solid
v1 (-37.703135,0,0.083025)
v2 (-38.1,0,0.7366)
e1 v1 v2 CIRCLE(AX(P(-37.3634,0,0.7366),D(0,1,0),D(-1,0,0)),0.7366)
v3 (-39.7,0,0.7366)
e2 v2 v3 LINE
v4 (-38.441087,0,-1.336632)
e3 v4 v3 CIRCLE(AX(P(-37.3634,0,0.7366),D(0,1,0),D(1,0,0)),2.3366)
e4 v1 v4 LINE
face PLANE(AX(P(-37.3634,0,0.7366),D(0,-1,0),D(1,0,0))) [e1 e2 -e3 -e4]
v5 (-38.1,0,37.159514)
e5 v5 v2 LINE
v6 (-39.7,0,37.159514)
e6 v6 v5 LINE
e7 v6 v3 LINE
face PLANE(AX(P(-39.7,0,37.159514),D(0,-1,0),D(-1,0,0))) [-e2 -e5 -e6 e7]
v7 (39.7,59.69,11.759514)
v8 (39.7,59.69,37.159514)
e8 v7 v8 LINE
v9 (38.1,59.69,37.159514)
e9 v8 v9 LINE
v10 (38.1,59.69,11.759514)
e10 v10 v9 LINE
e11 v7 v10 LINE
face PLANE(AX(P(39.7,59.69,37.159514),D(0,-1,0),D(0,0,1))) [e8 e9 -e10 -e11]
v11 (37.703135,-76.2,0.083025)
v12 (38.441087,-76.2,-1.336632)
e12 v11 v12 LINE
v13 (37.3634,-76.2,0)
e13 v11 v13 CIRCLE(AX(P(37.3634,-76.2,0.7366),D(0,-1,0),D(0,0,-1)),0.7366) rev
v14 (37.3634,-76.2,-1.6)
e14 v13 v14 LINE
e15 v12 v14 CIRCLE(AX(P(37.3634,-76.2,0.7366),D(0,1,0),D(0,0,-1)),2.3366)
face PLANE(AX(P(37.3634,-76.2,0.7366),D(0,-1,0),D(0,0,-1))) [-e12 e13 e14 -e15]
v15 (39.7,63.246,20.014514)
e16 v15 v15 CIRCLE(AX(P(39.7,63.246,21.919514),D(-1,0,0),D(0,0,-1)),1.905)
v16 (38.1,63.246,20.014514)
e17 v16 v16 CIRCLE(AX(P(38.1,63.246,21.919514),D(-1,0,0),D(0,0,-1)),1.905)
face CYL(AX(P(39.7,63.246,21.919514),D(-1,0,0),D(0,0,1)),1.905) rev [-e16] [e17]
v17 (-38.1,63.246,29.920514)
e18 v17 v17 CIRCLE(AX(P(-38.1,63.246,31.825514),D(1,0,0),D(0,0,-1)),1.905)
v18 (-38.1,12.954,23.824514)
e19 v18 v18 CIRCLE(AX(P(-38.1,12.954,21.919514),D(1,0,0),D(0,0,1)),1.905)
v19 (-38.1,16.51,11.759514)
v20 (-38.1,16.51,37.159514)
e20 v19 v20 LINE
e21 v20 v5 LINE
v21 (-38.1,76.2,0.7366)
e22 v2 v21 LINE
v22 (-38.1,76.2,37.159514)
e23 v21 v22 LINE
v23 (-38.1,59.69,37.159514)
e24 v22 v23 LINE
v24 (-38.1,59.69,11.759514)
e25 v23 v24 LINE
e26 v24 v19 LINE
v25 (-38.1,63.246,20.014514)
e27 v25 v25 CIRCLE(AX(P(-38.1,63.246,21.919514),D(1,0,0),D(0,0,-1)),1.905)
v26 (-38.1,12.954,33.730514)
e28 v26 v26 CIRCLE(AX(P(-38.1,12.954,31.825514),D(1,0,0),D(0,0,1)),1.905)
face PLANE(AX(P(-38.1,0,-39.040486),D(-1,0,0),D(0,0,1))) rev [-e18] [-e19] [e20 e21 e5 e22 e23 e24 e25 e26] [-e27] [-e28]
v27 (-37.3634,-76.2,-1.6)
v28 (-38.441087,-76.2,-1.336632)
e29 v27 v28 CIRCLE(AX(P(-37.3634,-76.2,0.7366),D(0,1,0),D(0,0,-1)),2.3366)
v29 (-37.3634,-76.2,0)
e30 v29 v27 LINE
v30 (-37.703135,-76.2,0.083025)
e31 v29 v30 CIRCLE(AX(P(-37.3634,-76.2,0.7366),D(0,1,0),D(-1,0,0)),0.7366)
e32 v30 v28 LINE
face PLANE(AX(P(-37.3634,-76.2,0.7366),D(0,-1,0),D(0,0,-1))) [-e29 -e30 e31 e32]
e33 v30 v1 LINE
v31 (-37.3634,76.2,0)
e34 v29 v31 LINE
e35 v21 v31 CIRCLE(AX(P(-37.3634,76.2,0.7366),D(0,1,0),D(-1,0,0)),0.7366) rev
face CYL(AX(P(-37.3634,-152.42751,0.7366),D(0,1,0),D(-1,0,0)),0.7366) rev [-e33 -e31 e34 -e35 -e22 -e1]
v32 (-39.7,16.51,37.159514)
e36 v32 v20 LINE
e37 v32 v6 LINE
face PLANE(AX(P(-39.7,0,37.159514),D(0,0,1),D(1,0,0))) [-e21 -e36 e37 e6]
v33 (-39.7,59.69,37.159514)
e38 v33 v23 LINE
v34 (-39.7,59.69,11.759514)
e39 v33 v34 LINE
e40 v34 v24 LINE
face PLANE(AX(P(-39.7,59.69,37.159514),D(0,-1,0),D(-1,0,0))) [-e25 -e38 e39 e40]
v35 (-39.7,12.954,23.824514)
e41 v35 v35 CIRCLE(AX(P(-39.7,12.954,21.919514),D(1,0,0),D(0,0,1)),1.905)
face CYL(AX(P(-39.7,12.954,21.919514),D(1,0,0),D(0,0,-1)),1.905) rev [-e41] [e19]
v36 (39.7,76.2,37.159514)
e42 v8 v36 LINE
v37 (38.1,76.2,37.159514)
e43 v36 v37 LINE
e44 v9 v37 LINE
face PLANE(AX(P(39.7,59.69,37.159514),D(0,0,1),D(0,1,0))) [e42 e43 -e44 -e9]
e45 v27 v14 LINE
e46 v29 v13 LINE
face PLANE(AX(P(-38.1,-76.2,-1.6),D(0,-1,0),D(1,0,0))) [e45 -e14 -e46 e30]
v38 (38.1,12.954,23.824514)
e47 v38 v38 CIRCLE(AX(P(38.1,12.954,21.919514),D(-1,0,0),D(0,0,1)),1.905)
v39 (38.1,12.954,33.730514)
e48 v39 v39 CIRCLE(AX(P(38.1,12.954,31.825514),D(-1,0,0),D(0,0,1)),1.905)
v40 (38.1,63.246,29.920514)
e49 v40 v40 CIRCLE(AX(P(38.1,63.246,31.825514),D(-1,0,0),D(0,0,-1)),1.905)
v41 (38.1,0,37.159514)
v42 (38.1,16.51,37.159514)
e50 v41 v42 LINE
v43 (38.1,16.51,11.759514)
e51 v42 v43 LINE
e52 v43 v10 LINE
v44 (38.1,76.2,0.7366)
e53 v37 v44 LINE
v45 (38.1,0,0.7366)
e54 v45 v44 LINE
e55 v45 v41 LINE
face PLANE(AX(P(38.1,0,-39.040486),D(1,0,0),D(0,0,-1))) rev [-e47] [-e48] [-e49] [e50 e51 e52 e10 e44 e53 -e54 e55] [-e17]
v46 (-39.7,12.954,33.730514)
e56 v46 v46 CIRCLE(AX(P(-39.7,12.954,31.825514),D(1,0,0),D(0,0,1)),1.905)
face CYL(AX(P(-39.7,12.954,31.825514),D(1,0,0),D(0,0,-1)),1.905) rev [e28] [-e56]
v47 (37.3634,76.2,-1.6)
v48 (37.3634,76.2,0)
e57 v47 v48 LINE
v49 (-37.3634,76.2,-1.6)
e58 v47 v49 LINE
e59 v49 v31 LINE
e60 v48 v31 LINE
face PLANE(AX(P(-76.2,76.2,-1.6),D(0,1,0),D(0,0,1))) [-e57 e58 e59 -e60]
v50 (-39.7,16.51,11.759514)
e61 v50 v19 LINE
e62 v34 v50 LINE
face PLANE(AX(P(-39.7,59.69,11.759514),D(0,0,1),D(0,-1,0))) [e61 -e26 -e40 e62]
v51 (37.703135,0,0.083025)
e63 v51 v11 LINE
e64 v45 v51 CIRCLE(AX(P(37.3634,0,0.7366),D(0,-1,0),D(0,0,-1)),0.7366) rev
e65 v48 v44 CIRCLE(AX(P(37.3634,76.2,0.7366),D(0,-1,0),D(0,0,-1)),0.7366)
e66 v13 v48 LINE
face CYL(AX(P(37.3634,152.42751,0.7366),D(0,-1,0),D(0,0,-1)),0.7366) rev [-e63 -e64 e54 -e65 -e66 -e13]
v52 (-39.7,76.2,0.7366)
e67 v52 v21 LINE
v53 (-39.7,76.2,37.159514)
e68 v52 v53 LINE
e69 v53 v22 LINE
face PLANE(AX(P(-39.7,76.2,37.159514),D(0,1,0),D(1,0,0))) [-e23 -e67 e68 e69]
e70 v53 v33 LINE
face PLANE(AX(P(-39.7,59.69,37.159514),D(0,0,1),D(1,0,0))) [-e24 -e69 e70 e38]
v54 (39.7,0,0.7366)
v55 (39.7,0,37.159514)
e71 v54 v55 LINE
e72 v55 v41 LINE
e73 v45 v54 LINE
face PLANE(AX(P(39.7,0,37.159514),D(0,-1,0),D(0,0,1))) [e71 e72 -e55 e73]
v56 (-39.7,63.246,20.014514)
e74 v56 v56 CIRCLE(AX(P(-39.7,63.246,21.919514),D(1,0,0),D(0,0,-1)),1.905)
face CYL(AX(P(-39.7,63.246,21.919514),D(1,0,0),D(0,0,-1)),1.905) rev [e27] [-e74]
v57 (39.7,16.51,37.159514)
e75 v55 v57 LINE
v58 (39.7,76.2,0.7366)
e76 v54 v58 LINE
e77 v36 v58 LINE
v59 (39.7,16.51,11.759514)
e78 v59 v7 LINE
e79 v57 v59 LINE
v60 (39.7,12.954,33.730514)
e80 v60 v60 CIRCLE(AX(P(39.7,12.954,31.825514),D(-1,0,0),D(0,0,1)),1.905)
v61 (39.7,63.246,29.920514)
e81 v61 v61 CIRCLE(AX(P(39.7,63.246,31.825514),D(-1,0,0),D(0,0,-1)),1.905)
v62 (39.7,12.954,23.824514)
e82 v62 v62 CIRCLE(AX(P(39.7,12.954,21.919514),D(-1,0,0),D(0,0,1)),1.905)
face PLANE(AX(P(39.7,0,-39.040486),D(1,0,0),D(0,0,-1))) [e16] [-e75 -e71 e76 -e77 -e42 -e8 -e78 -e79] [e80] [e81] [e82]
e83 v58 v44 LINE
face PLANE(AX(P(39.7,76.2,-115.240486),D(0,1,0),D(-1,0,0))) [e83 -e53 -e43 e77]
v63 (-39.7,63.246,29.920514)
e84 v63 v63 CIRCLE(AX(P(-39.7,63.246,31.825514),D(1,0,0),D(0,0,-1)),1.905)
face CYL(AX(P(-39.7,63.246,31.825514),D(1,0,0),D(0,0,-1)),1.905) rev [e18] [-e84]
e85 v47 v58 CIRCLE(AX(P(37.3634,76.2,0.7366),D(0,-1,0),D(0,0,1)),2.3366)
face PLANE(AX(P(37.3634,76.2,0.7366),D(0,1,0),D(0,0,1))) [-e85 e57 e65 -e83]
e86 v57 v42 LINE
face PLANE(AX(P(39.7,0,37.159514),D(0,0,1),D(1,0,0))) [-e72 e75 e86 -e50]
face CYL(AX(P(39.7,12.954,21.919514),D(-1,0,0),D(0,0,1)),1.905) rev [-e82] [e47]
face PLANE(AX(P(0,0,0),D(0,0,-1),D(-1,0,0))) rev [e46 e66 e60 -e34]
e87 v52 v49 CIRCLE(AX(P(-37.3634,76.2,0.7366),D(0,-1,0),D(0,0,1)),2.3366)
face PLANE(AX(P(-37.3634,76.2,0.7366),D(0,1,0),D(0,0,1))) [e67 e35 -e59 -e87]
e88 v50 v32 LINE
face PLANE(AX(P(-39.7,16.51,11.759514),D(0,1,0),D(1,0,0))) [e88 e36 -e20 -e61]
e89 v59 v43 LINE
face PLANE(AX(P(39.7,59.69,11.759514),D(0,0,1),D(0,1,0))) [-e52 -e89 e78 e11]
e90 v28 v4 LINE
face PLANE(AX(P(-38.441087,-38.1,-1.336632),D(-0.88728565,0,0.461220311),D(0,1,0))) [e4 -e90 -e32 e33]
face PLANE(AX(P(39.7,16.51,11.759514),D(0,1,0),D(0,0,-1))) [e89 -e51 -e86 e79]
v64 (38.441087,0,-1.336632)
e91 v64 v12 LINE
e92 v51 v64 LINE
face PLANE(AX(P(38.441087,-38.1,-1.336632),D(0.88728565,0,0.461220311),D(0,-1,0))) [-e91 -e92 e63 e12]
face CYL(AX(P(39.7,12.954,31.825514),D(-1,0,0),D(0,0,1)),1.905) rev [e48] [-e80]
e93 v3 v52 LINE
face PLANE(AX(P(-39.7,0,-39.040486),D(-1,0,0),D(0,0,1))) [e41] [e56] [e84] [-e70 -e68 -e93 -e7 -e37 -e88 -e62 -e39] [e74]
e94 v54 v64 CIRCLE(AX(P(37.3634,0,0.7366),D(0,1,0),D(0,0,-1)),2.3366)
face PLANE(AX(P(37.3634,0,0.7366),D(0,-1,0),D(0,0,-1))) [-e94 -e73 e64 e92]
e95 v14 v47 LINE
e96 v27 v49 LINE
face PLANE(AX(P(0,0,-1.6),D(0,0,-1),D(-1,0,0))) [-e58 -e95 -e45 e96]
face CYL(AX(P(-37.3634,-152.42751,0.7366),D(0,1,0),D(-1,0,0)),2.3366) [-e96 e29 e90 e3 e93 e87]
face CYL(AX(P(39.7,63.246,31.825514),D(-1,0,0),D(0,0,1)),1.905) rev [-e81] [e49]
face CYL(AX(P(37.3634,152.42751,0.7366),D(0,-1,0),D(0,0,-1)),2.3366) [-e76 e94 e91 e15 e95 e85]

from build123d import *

# Parameters (mm, degrees)
SKETCH1_R                  = 1.905
BASE_FLANGE1_DEPTH         = 1.6
SKETCHED_START             = -76.2
SKETCHED_BEND1_OUTLINE_W   = 76.2
SKETCHED_BEND1_OUTLINE_H   = 1.6
SKETCHED_BEND1_DEPTH       = 36.5
SKETCHED_START_2           = 39.7
SKETCHED_BEND1_2_OUTLINE_W = 76.2
SKETCHED_BEND1_2_OUTLINE_H = 1.6
SKETCHED_BEND1_2_DEPTH     = 36.5
SKETCHED_START_3           = -39.7
SKETCHED_BEND1_3_OUTLINE_R = 1.905
SKETCHED_BEND1_3_DEPTH     = 2.3366
SKETCHED_START_4           = 37.3634
SKETCHED_BEND1_4_OUTLINE_R = 1.905
SKETCHED_BEND1_4_DEPTH     = 2.3366
SKETCHED_START_5           = -38.441087378
SKETCHED_BEND1_5_OUTLINE_W = 76.2
SKETCHED_BEND1_5_OUTLINE_H = 1.6
SKETCHED_BEND1_5_DEPTH     = 0.341087378
SKETCHED_START_6           = 38.1
SKETCHED_BEND1_6_OUTLINE_W = 76.2
SKETCHED_BEND1_6_OUTLINE_H = 1.6
SKETCHED_BEND1_6_DEPTH     = 0.341087378
SKETCHED_START_7           = -77
SKETCHED_BEND1_7_DEPTH     = 154
SKETCHED_BEND1_8_DEPTH     = 77
SKETCHED_BEND1_9_DEPTH     = 76.2


with BuildPart() as part:
    # Base-Flange1: sheet metal written as solids
    # Sketch1 → Base-Flange1 (new body)
    with BuildSketch(Plane.XY):
        Polygon((-76.2, 59.69), (-50.8, 59.69), (-50.8, 16.51), (-76.2, 16.51), (-76.2, 0), (-38.1, 0), (-38.1, -76.2), (38.1, -76.2), (38.1, 0), (76.2, 0), (76.2, 16.51), (50.8, 16.51), (50.8, 59.69), (76.2, 59.69), (76.2, 76.2), (-76.2, 76.2), align=None)
        with Locations((-60.96, 63.246)):
            Circle(SKETCH1_R, mode=Mode.SUBTRACT)
        with Locations((-70.866, 63.246)):
            Circle(SKETCH1_R, mode=Mode.SUBTRACT)
        with Locations(Location((-70.866, 12.954, 0), (0, 0, 180))):
            Circle(SKETCH1_R, mode=Mode.SUBTRACT)
        with Locations(Location((-60.96, 12.954, 0), (0, 0, 180))):
            Circle(SKETCH1_R, mode=Mode.SUBTRACT)
        with Locations((60.96, 12.954)):
            Circle(SKETCH1_R, mode=Mode.SUBTRACT)
        with Locations((70.866, 12.954)):
            Circle(SKETCH1_R, mode=Mode.SUBTRACT)
        with Locations(Location((70.866, 63.246, 0), (0, 0, 180))):
            Circle(SKETCH1_R, mode=Mode.SUBTRACT)
        with Locations(Location((60.96, 63.246, 0), (0, 0, 180))):
            Circle(SKETCH1_R, mode=Mode.SUBTRACT)
    extrude(amount=-BASE_FLANGE1_DEPTH)

    # Sketched Bend1: read off the stored shape, not the designer's step
    # Sketched Bend1 outline → Sketched Bend1 (cut)
    with BuildSketch(Plane.YZ.offset(SKETCHED_START)):
        with Locations((38.1, -0.8)):
            Rectangle(SKETCHED_BEND1_OUTLINE_W, SKETCHED_BEND1_OUTLINE_H)
    extrude(amount=SKETCHED_BEND1_DEPTH, mode=Mode.SUBTRACT)

    # Sketched Bend1 2 outline → Sketched Bend1 2 (cut)
    with BuildSketch(Plane.YZ.offset(SKETCHED_START_2)):
        with Locations((38.1, -0.8)):
            Rectangle(SKETCHED_BEND1_2_OUTLINE_W, SKETCHED_BEND1_2_OUTLINE_H)
    extrude(amount=SKETCHED_BEND1_2_DEPTH, mode=Mode.SUBTRACT)

    # Sketched Bend1 3 outline → Sketched Bend1 3 (add)
    with BuildSketch(Plane.YZ.offset(SKETCHED_START_3)):
        Polygon((0, 0), (76.2, 0), (76.2, 37.159514364), (59.69, 37.159514364), (59.69, 11.759514364), (16.51, 11.759514364), (16.51, 37.159514364), (0, 37.159514364), align=None)
        with Locations((12.954, 21.919514364)):
            Circle(SKETCHED_BEND1_3_OUTLINE_R, mode=Mode.SUBTRACT)
        with Locations((63.246, 21.919514364)):
            Circle(SKETCHED_BEND1_3_OUTLINE_R, mode=Mode.SUBTRACT)
        with Locations((12.954, 31.825514364)):
            Circle(SKETCHED_BEND1_3_OUTLINE_R, mode=Mode.SUBTRACT)
        with Locations((63.246, 31.825514364)):
            Circle(SKETCHED_BEND1_3_OUTLINE_R, mode=Mode.SUBTRACT)
    extrude(amount=SKETCHED_BEND1_3_DEPTH)

    # Sketched Bend1 4 outline → Sketched Bend1 4 (add)
    with BuildSketch(Plane.YZ.offset(SKETCHED_START_4)):
        Polygon((0, 0), (76.2, 0), (76.2, 37.159514364), (59.69, 37.159514364), (59.69, 11.759514364), (16.51, 11.759514364), (16.51, 37.159514364), (0, 37.159514364), align=None)
        with Locations((12.954, 21.919514364)):
            Circle(SKETCHED_BEND1_4_OUTLINE_R, mode=Mode.SUBTRACT)
        with Locations((63.246, 21.919514364)):
            Circle(SKETCHED_BEND1_4_OUTLINE_R, mode=Mode.SUBTRACT)
        with Locations((12.954, 31.825514364)):
            Circle(SKETCHED_BEND1_4_OUTLINE_R, mode=Mode.SUBTRACT)
        with Locations((63.246, 31.825514364)):
            Circle(SKETCHED_BEND1_4_OUTLINE_R, mode=Mode.SUBTRACT)
    extrude(amount=SKETCHED_BEND1_4_DEPTH)

    # Sketched Bend1 5 outline → Sketched Bend1 5 (add)
    with BuildSketch(Plane.YZ.offset(SKETCHED_START_5)):
        with Locations((-38.1, -0.8)):
            Rectangle(SKETCHED_BEND1_5_OUTLINE_W, SKETCHED_BEND1_5_OUTLINE_H)
    extrude(amount=SKETCHED_BEND1_5_DEPTH)

    # Sketched Bend1 6 outline → Sketched Bend1 6 (add)
    with BuildSketch(Plane.YZ.offset(SKETCHED_START_6)):
        with Locations((-38.1, -0.8)):
            Rectangle(SKETCHED_BEND1_6_OUTLINE_W, SKETCHED_BEND1_6_OUTLINE_H)
    extrude(amount=SKETCHED_BEND1_6_DEPTH)

    # Sketched Bend1 7 outline → Sketched Bend1 7 (cut)
    with BuildSketch(Plane(origin=(0, 0, 0), x_dir=(1, 0, 0), z_dir=(0, 1, 0)).offset(SKETCHED_START_7)):
        with BuildLine():
            Line((-37.3634, 1.6), (-39.7, 1.6))
            Line((-39.7, 1.6), (-39.7, -0.7366))
            ThreePointArc((-39.7, -0.7366), (-39.015625705, 0.915625705), (-37.3634, 1.6))
        make_face()
        with BuildLine():
            ThreePointArc((-37.3634, 0), (-37.884254855, -0.215745145), (-38.1, -0.7366))
            Line((-38.1, -0.7366), (-38.1, -37.159514364))
            Line((-38.1, -37.159514364), (-37.3634, -37.159514364))
            Line((-37.3634, -37.159514364), (-37.3634, 0))
        make_face()
        with BuildLine():
            ThreePointArc((37.3634, 1.6), (39.015625705, 0.915625705), (39.7, -0.7366))
            Line((39.7, -0.7366), (39.7, 1.6))
            Line((39.7, 1.6), (37.3634, 1.6))
        make_face()
        with BuildLine():
            Line((37.3634, 0), (37.3634, -37.159514364))
            Line((37.3634, -37.159514364), (38.1, -37.159514364))
            Line((38.1, -37.159514364), (38.1, -0.7366))
            ThreePointArc((38.1, -0.7366), (37.884254855, -0.215745145), (37.3634, 0))
        make_face()
    extrude(amount=SKETCHED_BEND1_7_DEPTH, mode=Mode.SUBTRACT)

    # Sketched Bend1 8 outline → Sketched Bend1 8 (cut)
    with BuildSketch(Plane(origin=(0, 0, 0), x_dir=(1, 0, 0), z_dir=(0, 1, 0)).offset(SKETCHED_START_7)):
        Polygon((-37.746292342, 0), (-38.441087378, 1.33663165), (-38.441087378, 0), align=None)
        Polygon((38.441087378, 0), (38.441087378, 1.33663165), (37.746292342, 0), align=None)
    extrude(amount=SKETCHED_BEND1_8_DEPTH, mode=Mode.SUBTRACT)

    # Sketched Bend1 9 outline → Sketched Bend1 9 (add)
    with BuildSketch(Plane(origin=(0, 0, 0), x_dir=(1, 0, 0), z_dir=(0, 1, 0)).offset(SKETCHED_START)):
        with BuildLine():
            Line((-37.3634, 0), (-37.746292342, 0))
            Line((-37.746292342, 0), (-37.703134881, -0.08302539))
            ThreePointArc((-37.703134881, -0.08302539), (-37.538266381, -0.021057333), (-37.3634, 0))
        make_face()
        with BuildLine():
            Line((37.746292342, 0), (37.3634, 0))
            ThreePointArc((37.3634, 0), (37.538266381, -0.021057333), (37.703134881, -0.08302539))
            Line((37.703134881, -0.08302539), (37.746292342, 0))
        make_face()
    extrude(amount=SKETCHED_BEND1_9_DEPTH)


solid = part.part
